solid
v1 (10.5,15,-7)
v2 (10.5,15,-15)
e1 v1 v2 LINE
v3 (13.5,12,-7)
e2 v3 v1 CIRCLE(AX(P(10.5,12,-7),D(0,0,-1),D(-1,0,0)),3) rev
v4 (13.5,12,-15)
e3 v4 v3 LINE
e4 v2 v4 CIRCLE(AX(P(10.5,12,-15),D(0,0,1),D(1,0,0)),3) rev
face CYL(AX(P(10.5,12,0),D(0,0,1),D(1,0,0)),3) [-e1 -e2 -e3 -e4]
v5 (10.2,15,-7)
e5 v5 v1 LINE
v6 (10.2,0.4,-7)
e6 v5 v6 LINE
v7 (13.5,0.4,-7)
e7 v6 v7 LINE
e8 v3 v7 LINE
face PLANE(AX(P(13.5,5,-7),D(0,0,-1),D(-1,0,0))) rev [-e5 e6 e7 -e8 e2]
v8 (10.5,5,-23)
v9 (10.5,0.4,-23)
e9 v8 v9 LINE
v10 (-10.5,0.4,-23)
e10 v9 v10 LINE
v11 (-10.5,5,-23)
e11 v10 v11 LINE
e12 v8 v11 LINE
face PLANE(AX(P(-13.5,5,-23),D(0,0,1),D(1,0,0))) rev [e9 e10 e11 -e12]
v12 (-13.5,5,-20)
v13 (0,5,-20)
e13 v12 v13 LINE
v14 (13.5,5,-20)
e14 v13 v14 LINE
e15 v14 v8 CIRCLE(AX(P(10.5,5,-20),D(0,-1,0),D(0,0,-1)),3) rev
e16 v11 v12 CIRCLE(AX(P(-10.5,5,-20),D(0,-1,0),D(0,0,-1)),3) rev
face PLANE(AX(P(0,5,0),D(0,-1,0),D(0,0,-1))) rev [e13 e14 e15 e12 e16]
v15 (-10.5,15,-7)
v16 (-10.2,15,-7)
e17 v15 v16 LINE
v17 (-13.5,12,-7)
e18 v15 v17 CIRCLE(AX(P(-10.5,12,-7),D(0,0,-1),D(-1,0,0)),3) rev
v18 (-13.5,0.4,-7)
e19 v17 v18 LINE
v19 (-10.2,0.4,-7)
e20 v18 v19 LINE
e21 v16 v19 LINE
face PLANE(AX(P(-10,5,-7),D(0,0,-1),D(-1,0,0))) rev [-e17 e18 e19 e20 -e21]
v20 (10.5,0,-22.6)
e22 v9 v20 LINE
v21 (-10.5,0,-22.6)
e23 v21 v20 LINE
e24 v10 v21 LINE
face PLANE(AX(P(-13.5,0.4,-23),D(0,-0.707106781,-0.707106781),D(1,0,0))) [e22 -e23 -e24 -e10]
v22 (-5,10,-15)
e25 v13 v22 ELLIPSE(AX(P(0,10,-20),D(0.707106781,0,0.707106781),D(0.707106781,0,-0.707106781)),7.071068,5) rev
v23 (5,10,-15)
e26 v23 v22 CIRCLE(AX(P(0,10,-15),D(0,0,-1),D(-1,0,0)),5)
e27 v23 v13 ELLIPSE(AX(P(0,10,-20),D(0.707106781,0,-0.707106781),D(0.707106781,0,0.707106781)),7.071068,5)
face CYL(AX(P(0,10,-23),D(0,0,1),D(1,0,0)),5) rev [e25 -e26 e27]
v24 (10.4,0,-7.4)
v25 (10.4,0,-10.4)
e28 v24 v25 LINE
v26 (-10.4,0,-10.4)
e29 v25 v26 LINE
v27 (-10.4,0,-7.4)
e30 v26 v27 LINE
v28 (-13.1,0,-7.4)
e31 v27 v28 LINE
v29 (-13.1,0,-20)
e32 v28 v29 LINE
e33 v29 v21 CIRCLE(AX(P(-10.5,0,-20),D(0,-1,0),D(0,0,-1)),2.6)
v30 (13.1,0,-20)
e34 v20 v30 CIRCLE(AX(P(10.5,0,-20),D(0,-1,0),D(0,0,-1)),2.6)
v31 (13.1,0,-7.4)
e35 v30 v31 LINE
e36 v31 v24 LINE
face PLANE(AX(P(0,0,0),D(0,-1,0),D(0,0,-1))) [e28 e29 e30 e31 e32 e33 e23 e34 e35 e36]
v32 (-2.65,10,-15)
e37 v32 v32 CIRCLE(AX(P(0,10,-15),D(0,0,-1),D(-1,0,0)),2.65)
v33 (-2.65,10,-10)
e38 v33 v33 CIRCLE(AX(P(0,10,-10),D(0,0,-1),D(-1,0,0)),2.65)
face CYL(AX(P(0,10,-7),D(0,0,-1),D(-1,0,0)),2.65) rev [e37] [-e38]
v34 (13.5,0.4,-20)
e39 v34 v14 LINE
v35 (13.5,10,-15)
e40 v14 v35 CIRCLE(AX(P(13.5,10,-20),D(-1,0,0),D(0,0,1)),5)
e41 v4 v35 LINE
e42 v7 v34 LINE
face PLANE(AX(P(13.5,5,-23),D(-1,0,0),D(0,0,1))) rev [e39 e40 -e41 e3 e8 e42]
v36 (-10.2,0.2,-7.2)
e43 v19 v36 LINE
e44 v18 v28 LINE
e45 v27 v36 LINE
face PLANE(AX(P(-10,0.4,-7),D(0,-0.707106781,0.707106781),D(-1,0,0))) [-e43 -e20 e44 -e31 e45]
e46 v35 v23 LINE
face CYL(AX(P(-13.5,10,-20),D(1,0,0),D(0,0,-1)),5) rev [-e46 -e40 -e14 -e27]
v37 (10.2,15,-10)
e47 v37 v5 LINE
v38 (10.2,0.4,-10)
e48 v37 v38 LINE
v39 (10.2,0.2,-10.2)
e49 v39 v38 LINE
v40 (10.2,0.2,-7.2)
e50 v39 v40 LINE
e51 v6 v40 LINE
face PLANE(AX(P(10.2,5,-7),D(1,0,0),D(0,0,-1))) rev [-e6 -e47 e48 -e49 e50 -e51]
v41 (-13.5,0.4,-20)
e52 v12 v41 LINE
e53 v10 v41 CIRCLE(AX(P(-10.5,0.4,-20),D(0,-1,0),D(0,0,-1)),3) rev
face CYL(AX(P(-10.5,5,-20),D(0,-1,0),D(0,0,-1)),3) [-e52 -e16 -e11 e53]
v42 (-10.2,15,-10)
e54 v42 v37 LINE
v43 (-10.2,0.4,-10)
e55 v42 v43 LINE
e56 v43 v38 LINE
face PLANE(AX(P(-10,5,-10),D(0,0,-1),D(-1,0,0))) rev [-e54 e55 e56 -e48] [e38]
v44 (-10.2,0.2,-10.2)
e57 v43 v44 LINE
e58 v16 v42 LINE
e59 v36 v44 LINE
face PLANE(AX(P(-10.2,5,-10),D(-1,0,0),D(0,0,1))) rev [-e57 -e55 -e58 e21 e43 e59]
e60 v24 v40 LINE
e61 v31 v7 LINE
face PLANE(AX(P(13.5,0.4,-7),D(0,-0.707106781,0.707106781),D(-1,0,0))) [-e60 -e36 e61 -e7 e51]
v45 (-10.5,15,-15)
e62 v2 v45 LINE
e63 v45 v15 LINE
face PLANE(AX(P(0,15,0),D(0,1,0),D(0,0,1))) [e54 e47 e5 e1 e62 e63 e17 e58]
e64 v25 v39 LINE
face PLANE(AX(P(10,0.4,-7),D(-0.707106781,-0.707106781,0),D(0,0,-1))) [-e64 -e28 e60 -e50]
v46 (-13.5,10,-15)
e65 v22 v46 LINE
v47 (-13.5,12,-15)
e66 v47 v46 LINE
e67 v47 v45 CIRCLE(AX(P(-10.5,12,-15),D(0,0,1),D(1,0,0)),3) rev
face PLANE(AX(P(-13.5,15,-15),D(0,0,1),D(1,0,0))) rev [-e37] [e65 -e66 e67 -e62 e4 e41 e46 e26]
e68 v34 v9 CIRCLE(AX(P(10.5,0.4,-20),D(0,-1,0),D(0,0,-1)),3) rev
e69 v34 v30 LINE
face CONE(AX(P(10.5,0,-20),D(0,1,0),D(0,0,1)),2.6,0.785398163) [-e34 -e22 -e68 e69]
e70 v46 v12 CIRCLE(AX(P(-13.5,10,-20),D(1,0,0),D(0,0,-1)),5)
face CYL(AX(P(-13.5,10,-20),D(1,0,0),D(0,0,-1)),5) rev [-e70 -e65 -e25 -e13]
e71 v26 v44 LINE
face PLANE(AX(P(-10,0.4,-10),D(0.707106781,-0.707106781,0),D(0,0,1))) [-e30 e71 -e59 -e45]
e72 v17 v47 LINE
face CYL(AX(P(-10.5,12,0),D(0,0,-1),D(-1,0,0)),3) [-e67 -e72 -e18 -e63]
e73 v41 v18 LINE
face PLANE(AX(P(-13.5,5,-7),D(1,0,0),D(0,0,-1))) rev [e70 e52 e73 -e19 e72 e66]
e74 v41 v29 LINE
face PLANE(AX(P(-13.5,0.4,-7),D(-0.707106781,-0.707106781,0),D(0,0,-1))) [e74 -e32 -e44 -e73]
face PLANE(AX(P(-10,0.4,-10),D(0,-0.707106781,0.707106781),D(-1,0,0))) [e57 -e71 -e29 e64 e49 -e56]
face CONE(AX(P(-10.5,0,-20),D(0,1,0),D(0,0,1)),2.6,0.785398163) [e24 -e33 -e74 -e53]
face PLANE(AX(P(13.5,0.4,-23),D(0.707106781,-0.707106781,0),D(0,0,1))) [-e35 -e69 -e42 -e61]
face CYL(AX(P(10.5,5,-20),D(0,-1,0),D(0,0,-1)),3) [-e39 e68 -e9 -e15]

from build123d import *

# Parameters (mm, degrees)
BOSS_EXTRUDE1_DEPTH = 5
BOSS_EXTRUDE2_DEPTH = 10
FILLET1_R           = 5
FILLET2_R           = 3
SKETCH4_R           = 2.65
CUT_EXTRUDE1_DEPTH  = 22.708293346
SKETCH5_R           = 5
CUT_EXTRUDE2_DEPTH  = 22.708293346
CHAMFER1_SIZE       = 0.4
MOVE_START          = -10.2
MOVE_FACE1_DEPTH    = 20.4


with BuildPart() as part:
    # Sketch2 → Boss-Extrude1 (new body)
    with BuildSketch(Plane(origin=(0, 0, 0), x_dir=(1, 0, 0), z_dir=(0, 1, 0))):
        Polygon((-10, 10), (-10, 7), (-13.5, 7), (-13.5, 23), (13.5, 23), (13.5, 7), (10, 7), (10, 10), align=None)
    extrude(amount=BOSS_EXTRUDE1_DEPTH)

    # Sketch3 → Boss-Extrude2 (add)
    with BuildSketch(Plane(origin=(0, 5, 0), x_dir=(1, 0, 0), z_dir=(0, 1, 0))):
        Polygon((10, 7), (13.5, 7), (13.5, 15), (-13.5, 15), (-13.5, 7), (-10, 7), (-10, 10), (10, 10), align=None)
    extrude(amount=BOSS_EXTRUDE2_DEPTH)

    # Fillet1
    fillet1_edges = [part.edges().sort_by_distance(p)[0] for p in [
        (0, 5, -15),
    ]]
    fillet(fillet1_edges, radius=FILLET1_R)

    # Fillet2
    fillet2_edges = [part.edges().sort_by_distance(p)[0] for p in [
        (-13.5, 2.5, -23),
        (13.5, 2.5, -23),
        (-13.5, 15, -11),
        (13.5, 15, -11),
    ]]
    fillet(fillet2_edges, radius=FILLET2_R)

    # Sketch4 → Cut-Extrude1 (cut, through all)
    with BuildSketch(Plane(origin=(0, 0, -15), x_dir=(-1, 0, 0), z_dir=(0, 0, -1))):
        with Locations((0, 10)):
            Circle(SKETCH4_R)
    extrude(amount=-CUT_EXTRUDE1_DEPTH, mode=Mode.SUBTRACT)

    # Sketch5 → Cut-Extrude2 (cut, through all)
    with BuildSketch(Plane(origin=(0, 0, -15), x_dir=(-1, 0, 0), z_dir=(0, 0, -1))):
        with Locations((0, 10)):
            Circle(SKETCH5_R)
    extrude(amount=CUT_EXTRUDE2_DEPTH, mode=Mode.SUBTRACT)

    # Chamfer1
    chamfer1_edges = [part.edges().sort_by_distance(p)[0] for p in [
        (13.5, 0, -13.5),
        (11.75, 0, -7),
        (10, 0, -8.5),
        (-13.5, 0, -13.5),
        (0, 0, -23),
        (12.621320344, 0, -22.121320344),
        (-12.621320344, 0, -22.121320344),
        (0, 0, -10),
        (-10, 0, -8.5),
        (-11.75, 0, -7),
    ]]
    chamfer(chamfer1_edges, length=CHAMFER1_SIZE)

    # Move Face1: read off the stored shape, not the designer's step
    # Move Face1 outline → Move Face1 (cut)
    with BuildSketch(Plane.YZ.offset(MOVE_START)):
        Polygon((0.4, -10), (15, -10), (15, -7), (0.4, -7), (0.2, -7.2), (0.2, -10.2), align=None)
    extrude(amount=MOVE_FACE1_DEPTH, mode=Mode.SUBTRACT)


solid = part.part
